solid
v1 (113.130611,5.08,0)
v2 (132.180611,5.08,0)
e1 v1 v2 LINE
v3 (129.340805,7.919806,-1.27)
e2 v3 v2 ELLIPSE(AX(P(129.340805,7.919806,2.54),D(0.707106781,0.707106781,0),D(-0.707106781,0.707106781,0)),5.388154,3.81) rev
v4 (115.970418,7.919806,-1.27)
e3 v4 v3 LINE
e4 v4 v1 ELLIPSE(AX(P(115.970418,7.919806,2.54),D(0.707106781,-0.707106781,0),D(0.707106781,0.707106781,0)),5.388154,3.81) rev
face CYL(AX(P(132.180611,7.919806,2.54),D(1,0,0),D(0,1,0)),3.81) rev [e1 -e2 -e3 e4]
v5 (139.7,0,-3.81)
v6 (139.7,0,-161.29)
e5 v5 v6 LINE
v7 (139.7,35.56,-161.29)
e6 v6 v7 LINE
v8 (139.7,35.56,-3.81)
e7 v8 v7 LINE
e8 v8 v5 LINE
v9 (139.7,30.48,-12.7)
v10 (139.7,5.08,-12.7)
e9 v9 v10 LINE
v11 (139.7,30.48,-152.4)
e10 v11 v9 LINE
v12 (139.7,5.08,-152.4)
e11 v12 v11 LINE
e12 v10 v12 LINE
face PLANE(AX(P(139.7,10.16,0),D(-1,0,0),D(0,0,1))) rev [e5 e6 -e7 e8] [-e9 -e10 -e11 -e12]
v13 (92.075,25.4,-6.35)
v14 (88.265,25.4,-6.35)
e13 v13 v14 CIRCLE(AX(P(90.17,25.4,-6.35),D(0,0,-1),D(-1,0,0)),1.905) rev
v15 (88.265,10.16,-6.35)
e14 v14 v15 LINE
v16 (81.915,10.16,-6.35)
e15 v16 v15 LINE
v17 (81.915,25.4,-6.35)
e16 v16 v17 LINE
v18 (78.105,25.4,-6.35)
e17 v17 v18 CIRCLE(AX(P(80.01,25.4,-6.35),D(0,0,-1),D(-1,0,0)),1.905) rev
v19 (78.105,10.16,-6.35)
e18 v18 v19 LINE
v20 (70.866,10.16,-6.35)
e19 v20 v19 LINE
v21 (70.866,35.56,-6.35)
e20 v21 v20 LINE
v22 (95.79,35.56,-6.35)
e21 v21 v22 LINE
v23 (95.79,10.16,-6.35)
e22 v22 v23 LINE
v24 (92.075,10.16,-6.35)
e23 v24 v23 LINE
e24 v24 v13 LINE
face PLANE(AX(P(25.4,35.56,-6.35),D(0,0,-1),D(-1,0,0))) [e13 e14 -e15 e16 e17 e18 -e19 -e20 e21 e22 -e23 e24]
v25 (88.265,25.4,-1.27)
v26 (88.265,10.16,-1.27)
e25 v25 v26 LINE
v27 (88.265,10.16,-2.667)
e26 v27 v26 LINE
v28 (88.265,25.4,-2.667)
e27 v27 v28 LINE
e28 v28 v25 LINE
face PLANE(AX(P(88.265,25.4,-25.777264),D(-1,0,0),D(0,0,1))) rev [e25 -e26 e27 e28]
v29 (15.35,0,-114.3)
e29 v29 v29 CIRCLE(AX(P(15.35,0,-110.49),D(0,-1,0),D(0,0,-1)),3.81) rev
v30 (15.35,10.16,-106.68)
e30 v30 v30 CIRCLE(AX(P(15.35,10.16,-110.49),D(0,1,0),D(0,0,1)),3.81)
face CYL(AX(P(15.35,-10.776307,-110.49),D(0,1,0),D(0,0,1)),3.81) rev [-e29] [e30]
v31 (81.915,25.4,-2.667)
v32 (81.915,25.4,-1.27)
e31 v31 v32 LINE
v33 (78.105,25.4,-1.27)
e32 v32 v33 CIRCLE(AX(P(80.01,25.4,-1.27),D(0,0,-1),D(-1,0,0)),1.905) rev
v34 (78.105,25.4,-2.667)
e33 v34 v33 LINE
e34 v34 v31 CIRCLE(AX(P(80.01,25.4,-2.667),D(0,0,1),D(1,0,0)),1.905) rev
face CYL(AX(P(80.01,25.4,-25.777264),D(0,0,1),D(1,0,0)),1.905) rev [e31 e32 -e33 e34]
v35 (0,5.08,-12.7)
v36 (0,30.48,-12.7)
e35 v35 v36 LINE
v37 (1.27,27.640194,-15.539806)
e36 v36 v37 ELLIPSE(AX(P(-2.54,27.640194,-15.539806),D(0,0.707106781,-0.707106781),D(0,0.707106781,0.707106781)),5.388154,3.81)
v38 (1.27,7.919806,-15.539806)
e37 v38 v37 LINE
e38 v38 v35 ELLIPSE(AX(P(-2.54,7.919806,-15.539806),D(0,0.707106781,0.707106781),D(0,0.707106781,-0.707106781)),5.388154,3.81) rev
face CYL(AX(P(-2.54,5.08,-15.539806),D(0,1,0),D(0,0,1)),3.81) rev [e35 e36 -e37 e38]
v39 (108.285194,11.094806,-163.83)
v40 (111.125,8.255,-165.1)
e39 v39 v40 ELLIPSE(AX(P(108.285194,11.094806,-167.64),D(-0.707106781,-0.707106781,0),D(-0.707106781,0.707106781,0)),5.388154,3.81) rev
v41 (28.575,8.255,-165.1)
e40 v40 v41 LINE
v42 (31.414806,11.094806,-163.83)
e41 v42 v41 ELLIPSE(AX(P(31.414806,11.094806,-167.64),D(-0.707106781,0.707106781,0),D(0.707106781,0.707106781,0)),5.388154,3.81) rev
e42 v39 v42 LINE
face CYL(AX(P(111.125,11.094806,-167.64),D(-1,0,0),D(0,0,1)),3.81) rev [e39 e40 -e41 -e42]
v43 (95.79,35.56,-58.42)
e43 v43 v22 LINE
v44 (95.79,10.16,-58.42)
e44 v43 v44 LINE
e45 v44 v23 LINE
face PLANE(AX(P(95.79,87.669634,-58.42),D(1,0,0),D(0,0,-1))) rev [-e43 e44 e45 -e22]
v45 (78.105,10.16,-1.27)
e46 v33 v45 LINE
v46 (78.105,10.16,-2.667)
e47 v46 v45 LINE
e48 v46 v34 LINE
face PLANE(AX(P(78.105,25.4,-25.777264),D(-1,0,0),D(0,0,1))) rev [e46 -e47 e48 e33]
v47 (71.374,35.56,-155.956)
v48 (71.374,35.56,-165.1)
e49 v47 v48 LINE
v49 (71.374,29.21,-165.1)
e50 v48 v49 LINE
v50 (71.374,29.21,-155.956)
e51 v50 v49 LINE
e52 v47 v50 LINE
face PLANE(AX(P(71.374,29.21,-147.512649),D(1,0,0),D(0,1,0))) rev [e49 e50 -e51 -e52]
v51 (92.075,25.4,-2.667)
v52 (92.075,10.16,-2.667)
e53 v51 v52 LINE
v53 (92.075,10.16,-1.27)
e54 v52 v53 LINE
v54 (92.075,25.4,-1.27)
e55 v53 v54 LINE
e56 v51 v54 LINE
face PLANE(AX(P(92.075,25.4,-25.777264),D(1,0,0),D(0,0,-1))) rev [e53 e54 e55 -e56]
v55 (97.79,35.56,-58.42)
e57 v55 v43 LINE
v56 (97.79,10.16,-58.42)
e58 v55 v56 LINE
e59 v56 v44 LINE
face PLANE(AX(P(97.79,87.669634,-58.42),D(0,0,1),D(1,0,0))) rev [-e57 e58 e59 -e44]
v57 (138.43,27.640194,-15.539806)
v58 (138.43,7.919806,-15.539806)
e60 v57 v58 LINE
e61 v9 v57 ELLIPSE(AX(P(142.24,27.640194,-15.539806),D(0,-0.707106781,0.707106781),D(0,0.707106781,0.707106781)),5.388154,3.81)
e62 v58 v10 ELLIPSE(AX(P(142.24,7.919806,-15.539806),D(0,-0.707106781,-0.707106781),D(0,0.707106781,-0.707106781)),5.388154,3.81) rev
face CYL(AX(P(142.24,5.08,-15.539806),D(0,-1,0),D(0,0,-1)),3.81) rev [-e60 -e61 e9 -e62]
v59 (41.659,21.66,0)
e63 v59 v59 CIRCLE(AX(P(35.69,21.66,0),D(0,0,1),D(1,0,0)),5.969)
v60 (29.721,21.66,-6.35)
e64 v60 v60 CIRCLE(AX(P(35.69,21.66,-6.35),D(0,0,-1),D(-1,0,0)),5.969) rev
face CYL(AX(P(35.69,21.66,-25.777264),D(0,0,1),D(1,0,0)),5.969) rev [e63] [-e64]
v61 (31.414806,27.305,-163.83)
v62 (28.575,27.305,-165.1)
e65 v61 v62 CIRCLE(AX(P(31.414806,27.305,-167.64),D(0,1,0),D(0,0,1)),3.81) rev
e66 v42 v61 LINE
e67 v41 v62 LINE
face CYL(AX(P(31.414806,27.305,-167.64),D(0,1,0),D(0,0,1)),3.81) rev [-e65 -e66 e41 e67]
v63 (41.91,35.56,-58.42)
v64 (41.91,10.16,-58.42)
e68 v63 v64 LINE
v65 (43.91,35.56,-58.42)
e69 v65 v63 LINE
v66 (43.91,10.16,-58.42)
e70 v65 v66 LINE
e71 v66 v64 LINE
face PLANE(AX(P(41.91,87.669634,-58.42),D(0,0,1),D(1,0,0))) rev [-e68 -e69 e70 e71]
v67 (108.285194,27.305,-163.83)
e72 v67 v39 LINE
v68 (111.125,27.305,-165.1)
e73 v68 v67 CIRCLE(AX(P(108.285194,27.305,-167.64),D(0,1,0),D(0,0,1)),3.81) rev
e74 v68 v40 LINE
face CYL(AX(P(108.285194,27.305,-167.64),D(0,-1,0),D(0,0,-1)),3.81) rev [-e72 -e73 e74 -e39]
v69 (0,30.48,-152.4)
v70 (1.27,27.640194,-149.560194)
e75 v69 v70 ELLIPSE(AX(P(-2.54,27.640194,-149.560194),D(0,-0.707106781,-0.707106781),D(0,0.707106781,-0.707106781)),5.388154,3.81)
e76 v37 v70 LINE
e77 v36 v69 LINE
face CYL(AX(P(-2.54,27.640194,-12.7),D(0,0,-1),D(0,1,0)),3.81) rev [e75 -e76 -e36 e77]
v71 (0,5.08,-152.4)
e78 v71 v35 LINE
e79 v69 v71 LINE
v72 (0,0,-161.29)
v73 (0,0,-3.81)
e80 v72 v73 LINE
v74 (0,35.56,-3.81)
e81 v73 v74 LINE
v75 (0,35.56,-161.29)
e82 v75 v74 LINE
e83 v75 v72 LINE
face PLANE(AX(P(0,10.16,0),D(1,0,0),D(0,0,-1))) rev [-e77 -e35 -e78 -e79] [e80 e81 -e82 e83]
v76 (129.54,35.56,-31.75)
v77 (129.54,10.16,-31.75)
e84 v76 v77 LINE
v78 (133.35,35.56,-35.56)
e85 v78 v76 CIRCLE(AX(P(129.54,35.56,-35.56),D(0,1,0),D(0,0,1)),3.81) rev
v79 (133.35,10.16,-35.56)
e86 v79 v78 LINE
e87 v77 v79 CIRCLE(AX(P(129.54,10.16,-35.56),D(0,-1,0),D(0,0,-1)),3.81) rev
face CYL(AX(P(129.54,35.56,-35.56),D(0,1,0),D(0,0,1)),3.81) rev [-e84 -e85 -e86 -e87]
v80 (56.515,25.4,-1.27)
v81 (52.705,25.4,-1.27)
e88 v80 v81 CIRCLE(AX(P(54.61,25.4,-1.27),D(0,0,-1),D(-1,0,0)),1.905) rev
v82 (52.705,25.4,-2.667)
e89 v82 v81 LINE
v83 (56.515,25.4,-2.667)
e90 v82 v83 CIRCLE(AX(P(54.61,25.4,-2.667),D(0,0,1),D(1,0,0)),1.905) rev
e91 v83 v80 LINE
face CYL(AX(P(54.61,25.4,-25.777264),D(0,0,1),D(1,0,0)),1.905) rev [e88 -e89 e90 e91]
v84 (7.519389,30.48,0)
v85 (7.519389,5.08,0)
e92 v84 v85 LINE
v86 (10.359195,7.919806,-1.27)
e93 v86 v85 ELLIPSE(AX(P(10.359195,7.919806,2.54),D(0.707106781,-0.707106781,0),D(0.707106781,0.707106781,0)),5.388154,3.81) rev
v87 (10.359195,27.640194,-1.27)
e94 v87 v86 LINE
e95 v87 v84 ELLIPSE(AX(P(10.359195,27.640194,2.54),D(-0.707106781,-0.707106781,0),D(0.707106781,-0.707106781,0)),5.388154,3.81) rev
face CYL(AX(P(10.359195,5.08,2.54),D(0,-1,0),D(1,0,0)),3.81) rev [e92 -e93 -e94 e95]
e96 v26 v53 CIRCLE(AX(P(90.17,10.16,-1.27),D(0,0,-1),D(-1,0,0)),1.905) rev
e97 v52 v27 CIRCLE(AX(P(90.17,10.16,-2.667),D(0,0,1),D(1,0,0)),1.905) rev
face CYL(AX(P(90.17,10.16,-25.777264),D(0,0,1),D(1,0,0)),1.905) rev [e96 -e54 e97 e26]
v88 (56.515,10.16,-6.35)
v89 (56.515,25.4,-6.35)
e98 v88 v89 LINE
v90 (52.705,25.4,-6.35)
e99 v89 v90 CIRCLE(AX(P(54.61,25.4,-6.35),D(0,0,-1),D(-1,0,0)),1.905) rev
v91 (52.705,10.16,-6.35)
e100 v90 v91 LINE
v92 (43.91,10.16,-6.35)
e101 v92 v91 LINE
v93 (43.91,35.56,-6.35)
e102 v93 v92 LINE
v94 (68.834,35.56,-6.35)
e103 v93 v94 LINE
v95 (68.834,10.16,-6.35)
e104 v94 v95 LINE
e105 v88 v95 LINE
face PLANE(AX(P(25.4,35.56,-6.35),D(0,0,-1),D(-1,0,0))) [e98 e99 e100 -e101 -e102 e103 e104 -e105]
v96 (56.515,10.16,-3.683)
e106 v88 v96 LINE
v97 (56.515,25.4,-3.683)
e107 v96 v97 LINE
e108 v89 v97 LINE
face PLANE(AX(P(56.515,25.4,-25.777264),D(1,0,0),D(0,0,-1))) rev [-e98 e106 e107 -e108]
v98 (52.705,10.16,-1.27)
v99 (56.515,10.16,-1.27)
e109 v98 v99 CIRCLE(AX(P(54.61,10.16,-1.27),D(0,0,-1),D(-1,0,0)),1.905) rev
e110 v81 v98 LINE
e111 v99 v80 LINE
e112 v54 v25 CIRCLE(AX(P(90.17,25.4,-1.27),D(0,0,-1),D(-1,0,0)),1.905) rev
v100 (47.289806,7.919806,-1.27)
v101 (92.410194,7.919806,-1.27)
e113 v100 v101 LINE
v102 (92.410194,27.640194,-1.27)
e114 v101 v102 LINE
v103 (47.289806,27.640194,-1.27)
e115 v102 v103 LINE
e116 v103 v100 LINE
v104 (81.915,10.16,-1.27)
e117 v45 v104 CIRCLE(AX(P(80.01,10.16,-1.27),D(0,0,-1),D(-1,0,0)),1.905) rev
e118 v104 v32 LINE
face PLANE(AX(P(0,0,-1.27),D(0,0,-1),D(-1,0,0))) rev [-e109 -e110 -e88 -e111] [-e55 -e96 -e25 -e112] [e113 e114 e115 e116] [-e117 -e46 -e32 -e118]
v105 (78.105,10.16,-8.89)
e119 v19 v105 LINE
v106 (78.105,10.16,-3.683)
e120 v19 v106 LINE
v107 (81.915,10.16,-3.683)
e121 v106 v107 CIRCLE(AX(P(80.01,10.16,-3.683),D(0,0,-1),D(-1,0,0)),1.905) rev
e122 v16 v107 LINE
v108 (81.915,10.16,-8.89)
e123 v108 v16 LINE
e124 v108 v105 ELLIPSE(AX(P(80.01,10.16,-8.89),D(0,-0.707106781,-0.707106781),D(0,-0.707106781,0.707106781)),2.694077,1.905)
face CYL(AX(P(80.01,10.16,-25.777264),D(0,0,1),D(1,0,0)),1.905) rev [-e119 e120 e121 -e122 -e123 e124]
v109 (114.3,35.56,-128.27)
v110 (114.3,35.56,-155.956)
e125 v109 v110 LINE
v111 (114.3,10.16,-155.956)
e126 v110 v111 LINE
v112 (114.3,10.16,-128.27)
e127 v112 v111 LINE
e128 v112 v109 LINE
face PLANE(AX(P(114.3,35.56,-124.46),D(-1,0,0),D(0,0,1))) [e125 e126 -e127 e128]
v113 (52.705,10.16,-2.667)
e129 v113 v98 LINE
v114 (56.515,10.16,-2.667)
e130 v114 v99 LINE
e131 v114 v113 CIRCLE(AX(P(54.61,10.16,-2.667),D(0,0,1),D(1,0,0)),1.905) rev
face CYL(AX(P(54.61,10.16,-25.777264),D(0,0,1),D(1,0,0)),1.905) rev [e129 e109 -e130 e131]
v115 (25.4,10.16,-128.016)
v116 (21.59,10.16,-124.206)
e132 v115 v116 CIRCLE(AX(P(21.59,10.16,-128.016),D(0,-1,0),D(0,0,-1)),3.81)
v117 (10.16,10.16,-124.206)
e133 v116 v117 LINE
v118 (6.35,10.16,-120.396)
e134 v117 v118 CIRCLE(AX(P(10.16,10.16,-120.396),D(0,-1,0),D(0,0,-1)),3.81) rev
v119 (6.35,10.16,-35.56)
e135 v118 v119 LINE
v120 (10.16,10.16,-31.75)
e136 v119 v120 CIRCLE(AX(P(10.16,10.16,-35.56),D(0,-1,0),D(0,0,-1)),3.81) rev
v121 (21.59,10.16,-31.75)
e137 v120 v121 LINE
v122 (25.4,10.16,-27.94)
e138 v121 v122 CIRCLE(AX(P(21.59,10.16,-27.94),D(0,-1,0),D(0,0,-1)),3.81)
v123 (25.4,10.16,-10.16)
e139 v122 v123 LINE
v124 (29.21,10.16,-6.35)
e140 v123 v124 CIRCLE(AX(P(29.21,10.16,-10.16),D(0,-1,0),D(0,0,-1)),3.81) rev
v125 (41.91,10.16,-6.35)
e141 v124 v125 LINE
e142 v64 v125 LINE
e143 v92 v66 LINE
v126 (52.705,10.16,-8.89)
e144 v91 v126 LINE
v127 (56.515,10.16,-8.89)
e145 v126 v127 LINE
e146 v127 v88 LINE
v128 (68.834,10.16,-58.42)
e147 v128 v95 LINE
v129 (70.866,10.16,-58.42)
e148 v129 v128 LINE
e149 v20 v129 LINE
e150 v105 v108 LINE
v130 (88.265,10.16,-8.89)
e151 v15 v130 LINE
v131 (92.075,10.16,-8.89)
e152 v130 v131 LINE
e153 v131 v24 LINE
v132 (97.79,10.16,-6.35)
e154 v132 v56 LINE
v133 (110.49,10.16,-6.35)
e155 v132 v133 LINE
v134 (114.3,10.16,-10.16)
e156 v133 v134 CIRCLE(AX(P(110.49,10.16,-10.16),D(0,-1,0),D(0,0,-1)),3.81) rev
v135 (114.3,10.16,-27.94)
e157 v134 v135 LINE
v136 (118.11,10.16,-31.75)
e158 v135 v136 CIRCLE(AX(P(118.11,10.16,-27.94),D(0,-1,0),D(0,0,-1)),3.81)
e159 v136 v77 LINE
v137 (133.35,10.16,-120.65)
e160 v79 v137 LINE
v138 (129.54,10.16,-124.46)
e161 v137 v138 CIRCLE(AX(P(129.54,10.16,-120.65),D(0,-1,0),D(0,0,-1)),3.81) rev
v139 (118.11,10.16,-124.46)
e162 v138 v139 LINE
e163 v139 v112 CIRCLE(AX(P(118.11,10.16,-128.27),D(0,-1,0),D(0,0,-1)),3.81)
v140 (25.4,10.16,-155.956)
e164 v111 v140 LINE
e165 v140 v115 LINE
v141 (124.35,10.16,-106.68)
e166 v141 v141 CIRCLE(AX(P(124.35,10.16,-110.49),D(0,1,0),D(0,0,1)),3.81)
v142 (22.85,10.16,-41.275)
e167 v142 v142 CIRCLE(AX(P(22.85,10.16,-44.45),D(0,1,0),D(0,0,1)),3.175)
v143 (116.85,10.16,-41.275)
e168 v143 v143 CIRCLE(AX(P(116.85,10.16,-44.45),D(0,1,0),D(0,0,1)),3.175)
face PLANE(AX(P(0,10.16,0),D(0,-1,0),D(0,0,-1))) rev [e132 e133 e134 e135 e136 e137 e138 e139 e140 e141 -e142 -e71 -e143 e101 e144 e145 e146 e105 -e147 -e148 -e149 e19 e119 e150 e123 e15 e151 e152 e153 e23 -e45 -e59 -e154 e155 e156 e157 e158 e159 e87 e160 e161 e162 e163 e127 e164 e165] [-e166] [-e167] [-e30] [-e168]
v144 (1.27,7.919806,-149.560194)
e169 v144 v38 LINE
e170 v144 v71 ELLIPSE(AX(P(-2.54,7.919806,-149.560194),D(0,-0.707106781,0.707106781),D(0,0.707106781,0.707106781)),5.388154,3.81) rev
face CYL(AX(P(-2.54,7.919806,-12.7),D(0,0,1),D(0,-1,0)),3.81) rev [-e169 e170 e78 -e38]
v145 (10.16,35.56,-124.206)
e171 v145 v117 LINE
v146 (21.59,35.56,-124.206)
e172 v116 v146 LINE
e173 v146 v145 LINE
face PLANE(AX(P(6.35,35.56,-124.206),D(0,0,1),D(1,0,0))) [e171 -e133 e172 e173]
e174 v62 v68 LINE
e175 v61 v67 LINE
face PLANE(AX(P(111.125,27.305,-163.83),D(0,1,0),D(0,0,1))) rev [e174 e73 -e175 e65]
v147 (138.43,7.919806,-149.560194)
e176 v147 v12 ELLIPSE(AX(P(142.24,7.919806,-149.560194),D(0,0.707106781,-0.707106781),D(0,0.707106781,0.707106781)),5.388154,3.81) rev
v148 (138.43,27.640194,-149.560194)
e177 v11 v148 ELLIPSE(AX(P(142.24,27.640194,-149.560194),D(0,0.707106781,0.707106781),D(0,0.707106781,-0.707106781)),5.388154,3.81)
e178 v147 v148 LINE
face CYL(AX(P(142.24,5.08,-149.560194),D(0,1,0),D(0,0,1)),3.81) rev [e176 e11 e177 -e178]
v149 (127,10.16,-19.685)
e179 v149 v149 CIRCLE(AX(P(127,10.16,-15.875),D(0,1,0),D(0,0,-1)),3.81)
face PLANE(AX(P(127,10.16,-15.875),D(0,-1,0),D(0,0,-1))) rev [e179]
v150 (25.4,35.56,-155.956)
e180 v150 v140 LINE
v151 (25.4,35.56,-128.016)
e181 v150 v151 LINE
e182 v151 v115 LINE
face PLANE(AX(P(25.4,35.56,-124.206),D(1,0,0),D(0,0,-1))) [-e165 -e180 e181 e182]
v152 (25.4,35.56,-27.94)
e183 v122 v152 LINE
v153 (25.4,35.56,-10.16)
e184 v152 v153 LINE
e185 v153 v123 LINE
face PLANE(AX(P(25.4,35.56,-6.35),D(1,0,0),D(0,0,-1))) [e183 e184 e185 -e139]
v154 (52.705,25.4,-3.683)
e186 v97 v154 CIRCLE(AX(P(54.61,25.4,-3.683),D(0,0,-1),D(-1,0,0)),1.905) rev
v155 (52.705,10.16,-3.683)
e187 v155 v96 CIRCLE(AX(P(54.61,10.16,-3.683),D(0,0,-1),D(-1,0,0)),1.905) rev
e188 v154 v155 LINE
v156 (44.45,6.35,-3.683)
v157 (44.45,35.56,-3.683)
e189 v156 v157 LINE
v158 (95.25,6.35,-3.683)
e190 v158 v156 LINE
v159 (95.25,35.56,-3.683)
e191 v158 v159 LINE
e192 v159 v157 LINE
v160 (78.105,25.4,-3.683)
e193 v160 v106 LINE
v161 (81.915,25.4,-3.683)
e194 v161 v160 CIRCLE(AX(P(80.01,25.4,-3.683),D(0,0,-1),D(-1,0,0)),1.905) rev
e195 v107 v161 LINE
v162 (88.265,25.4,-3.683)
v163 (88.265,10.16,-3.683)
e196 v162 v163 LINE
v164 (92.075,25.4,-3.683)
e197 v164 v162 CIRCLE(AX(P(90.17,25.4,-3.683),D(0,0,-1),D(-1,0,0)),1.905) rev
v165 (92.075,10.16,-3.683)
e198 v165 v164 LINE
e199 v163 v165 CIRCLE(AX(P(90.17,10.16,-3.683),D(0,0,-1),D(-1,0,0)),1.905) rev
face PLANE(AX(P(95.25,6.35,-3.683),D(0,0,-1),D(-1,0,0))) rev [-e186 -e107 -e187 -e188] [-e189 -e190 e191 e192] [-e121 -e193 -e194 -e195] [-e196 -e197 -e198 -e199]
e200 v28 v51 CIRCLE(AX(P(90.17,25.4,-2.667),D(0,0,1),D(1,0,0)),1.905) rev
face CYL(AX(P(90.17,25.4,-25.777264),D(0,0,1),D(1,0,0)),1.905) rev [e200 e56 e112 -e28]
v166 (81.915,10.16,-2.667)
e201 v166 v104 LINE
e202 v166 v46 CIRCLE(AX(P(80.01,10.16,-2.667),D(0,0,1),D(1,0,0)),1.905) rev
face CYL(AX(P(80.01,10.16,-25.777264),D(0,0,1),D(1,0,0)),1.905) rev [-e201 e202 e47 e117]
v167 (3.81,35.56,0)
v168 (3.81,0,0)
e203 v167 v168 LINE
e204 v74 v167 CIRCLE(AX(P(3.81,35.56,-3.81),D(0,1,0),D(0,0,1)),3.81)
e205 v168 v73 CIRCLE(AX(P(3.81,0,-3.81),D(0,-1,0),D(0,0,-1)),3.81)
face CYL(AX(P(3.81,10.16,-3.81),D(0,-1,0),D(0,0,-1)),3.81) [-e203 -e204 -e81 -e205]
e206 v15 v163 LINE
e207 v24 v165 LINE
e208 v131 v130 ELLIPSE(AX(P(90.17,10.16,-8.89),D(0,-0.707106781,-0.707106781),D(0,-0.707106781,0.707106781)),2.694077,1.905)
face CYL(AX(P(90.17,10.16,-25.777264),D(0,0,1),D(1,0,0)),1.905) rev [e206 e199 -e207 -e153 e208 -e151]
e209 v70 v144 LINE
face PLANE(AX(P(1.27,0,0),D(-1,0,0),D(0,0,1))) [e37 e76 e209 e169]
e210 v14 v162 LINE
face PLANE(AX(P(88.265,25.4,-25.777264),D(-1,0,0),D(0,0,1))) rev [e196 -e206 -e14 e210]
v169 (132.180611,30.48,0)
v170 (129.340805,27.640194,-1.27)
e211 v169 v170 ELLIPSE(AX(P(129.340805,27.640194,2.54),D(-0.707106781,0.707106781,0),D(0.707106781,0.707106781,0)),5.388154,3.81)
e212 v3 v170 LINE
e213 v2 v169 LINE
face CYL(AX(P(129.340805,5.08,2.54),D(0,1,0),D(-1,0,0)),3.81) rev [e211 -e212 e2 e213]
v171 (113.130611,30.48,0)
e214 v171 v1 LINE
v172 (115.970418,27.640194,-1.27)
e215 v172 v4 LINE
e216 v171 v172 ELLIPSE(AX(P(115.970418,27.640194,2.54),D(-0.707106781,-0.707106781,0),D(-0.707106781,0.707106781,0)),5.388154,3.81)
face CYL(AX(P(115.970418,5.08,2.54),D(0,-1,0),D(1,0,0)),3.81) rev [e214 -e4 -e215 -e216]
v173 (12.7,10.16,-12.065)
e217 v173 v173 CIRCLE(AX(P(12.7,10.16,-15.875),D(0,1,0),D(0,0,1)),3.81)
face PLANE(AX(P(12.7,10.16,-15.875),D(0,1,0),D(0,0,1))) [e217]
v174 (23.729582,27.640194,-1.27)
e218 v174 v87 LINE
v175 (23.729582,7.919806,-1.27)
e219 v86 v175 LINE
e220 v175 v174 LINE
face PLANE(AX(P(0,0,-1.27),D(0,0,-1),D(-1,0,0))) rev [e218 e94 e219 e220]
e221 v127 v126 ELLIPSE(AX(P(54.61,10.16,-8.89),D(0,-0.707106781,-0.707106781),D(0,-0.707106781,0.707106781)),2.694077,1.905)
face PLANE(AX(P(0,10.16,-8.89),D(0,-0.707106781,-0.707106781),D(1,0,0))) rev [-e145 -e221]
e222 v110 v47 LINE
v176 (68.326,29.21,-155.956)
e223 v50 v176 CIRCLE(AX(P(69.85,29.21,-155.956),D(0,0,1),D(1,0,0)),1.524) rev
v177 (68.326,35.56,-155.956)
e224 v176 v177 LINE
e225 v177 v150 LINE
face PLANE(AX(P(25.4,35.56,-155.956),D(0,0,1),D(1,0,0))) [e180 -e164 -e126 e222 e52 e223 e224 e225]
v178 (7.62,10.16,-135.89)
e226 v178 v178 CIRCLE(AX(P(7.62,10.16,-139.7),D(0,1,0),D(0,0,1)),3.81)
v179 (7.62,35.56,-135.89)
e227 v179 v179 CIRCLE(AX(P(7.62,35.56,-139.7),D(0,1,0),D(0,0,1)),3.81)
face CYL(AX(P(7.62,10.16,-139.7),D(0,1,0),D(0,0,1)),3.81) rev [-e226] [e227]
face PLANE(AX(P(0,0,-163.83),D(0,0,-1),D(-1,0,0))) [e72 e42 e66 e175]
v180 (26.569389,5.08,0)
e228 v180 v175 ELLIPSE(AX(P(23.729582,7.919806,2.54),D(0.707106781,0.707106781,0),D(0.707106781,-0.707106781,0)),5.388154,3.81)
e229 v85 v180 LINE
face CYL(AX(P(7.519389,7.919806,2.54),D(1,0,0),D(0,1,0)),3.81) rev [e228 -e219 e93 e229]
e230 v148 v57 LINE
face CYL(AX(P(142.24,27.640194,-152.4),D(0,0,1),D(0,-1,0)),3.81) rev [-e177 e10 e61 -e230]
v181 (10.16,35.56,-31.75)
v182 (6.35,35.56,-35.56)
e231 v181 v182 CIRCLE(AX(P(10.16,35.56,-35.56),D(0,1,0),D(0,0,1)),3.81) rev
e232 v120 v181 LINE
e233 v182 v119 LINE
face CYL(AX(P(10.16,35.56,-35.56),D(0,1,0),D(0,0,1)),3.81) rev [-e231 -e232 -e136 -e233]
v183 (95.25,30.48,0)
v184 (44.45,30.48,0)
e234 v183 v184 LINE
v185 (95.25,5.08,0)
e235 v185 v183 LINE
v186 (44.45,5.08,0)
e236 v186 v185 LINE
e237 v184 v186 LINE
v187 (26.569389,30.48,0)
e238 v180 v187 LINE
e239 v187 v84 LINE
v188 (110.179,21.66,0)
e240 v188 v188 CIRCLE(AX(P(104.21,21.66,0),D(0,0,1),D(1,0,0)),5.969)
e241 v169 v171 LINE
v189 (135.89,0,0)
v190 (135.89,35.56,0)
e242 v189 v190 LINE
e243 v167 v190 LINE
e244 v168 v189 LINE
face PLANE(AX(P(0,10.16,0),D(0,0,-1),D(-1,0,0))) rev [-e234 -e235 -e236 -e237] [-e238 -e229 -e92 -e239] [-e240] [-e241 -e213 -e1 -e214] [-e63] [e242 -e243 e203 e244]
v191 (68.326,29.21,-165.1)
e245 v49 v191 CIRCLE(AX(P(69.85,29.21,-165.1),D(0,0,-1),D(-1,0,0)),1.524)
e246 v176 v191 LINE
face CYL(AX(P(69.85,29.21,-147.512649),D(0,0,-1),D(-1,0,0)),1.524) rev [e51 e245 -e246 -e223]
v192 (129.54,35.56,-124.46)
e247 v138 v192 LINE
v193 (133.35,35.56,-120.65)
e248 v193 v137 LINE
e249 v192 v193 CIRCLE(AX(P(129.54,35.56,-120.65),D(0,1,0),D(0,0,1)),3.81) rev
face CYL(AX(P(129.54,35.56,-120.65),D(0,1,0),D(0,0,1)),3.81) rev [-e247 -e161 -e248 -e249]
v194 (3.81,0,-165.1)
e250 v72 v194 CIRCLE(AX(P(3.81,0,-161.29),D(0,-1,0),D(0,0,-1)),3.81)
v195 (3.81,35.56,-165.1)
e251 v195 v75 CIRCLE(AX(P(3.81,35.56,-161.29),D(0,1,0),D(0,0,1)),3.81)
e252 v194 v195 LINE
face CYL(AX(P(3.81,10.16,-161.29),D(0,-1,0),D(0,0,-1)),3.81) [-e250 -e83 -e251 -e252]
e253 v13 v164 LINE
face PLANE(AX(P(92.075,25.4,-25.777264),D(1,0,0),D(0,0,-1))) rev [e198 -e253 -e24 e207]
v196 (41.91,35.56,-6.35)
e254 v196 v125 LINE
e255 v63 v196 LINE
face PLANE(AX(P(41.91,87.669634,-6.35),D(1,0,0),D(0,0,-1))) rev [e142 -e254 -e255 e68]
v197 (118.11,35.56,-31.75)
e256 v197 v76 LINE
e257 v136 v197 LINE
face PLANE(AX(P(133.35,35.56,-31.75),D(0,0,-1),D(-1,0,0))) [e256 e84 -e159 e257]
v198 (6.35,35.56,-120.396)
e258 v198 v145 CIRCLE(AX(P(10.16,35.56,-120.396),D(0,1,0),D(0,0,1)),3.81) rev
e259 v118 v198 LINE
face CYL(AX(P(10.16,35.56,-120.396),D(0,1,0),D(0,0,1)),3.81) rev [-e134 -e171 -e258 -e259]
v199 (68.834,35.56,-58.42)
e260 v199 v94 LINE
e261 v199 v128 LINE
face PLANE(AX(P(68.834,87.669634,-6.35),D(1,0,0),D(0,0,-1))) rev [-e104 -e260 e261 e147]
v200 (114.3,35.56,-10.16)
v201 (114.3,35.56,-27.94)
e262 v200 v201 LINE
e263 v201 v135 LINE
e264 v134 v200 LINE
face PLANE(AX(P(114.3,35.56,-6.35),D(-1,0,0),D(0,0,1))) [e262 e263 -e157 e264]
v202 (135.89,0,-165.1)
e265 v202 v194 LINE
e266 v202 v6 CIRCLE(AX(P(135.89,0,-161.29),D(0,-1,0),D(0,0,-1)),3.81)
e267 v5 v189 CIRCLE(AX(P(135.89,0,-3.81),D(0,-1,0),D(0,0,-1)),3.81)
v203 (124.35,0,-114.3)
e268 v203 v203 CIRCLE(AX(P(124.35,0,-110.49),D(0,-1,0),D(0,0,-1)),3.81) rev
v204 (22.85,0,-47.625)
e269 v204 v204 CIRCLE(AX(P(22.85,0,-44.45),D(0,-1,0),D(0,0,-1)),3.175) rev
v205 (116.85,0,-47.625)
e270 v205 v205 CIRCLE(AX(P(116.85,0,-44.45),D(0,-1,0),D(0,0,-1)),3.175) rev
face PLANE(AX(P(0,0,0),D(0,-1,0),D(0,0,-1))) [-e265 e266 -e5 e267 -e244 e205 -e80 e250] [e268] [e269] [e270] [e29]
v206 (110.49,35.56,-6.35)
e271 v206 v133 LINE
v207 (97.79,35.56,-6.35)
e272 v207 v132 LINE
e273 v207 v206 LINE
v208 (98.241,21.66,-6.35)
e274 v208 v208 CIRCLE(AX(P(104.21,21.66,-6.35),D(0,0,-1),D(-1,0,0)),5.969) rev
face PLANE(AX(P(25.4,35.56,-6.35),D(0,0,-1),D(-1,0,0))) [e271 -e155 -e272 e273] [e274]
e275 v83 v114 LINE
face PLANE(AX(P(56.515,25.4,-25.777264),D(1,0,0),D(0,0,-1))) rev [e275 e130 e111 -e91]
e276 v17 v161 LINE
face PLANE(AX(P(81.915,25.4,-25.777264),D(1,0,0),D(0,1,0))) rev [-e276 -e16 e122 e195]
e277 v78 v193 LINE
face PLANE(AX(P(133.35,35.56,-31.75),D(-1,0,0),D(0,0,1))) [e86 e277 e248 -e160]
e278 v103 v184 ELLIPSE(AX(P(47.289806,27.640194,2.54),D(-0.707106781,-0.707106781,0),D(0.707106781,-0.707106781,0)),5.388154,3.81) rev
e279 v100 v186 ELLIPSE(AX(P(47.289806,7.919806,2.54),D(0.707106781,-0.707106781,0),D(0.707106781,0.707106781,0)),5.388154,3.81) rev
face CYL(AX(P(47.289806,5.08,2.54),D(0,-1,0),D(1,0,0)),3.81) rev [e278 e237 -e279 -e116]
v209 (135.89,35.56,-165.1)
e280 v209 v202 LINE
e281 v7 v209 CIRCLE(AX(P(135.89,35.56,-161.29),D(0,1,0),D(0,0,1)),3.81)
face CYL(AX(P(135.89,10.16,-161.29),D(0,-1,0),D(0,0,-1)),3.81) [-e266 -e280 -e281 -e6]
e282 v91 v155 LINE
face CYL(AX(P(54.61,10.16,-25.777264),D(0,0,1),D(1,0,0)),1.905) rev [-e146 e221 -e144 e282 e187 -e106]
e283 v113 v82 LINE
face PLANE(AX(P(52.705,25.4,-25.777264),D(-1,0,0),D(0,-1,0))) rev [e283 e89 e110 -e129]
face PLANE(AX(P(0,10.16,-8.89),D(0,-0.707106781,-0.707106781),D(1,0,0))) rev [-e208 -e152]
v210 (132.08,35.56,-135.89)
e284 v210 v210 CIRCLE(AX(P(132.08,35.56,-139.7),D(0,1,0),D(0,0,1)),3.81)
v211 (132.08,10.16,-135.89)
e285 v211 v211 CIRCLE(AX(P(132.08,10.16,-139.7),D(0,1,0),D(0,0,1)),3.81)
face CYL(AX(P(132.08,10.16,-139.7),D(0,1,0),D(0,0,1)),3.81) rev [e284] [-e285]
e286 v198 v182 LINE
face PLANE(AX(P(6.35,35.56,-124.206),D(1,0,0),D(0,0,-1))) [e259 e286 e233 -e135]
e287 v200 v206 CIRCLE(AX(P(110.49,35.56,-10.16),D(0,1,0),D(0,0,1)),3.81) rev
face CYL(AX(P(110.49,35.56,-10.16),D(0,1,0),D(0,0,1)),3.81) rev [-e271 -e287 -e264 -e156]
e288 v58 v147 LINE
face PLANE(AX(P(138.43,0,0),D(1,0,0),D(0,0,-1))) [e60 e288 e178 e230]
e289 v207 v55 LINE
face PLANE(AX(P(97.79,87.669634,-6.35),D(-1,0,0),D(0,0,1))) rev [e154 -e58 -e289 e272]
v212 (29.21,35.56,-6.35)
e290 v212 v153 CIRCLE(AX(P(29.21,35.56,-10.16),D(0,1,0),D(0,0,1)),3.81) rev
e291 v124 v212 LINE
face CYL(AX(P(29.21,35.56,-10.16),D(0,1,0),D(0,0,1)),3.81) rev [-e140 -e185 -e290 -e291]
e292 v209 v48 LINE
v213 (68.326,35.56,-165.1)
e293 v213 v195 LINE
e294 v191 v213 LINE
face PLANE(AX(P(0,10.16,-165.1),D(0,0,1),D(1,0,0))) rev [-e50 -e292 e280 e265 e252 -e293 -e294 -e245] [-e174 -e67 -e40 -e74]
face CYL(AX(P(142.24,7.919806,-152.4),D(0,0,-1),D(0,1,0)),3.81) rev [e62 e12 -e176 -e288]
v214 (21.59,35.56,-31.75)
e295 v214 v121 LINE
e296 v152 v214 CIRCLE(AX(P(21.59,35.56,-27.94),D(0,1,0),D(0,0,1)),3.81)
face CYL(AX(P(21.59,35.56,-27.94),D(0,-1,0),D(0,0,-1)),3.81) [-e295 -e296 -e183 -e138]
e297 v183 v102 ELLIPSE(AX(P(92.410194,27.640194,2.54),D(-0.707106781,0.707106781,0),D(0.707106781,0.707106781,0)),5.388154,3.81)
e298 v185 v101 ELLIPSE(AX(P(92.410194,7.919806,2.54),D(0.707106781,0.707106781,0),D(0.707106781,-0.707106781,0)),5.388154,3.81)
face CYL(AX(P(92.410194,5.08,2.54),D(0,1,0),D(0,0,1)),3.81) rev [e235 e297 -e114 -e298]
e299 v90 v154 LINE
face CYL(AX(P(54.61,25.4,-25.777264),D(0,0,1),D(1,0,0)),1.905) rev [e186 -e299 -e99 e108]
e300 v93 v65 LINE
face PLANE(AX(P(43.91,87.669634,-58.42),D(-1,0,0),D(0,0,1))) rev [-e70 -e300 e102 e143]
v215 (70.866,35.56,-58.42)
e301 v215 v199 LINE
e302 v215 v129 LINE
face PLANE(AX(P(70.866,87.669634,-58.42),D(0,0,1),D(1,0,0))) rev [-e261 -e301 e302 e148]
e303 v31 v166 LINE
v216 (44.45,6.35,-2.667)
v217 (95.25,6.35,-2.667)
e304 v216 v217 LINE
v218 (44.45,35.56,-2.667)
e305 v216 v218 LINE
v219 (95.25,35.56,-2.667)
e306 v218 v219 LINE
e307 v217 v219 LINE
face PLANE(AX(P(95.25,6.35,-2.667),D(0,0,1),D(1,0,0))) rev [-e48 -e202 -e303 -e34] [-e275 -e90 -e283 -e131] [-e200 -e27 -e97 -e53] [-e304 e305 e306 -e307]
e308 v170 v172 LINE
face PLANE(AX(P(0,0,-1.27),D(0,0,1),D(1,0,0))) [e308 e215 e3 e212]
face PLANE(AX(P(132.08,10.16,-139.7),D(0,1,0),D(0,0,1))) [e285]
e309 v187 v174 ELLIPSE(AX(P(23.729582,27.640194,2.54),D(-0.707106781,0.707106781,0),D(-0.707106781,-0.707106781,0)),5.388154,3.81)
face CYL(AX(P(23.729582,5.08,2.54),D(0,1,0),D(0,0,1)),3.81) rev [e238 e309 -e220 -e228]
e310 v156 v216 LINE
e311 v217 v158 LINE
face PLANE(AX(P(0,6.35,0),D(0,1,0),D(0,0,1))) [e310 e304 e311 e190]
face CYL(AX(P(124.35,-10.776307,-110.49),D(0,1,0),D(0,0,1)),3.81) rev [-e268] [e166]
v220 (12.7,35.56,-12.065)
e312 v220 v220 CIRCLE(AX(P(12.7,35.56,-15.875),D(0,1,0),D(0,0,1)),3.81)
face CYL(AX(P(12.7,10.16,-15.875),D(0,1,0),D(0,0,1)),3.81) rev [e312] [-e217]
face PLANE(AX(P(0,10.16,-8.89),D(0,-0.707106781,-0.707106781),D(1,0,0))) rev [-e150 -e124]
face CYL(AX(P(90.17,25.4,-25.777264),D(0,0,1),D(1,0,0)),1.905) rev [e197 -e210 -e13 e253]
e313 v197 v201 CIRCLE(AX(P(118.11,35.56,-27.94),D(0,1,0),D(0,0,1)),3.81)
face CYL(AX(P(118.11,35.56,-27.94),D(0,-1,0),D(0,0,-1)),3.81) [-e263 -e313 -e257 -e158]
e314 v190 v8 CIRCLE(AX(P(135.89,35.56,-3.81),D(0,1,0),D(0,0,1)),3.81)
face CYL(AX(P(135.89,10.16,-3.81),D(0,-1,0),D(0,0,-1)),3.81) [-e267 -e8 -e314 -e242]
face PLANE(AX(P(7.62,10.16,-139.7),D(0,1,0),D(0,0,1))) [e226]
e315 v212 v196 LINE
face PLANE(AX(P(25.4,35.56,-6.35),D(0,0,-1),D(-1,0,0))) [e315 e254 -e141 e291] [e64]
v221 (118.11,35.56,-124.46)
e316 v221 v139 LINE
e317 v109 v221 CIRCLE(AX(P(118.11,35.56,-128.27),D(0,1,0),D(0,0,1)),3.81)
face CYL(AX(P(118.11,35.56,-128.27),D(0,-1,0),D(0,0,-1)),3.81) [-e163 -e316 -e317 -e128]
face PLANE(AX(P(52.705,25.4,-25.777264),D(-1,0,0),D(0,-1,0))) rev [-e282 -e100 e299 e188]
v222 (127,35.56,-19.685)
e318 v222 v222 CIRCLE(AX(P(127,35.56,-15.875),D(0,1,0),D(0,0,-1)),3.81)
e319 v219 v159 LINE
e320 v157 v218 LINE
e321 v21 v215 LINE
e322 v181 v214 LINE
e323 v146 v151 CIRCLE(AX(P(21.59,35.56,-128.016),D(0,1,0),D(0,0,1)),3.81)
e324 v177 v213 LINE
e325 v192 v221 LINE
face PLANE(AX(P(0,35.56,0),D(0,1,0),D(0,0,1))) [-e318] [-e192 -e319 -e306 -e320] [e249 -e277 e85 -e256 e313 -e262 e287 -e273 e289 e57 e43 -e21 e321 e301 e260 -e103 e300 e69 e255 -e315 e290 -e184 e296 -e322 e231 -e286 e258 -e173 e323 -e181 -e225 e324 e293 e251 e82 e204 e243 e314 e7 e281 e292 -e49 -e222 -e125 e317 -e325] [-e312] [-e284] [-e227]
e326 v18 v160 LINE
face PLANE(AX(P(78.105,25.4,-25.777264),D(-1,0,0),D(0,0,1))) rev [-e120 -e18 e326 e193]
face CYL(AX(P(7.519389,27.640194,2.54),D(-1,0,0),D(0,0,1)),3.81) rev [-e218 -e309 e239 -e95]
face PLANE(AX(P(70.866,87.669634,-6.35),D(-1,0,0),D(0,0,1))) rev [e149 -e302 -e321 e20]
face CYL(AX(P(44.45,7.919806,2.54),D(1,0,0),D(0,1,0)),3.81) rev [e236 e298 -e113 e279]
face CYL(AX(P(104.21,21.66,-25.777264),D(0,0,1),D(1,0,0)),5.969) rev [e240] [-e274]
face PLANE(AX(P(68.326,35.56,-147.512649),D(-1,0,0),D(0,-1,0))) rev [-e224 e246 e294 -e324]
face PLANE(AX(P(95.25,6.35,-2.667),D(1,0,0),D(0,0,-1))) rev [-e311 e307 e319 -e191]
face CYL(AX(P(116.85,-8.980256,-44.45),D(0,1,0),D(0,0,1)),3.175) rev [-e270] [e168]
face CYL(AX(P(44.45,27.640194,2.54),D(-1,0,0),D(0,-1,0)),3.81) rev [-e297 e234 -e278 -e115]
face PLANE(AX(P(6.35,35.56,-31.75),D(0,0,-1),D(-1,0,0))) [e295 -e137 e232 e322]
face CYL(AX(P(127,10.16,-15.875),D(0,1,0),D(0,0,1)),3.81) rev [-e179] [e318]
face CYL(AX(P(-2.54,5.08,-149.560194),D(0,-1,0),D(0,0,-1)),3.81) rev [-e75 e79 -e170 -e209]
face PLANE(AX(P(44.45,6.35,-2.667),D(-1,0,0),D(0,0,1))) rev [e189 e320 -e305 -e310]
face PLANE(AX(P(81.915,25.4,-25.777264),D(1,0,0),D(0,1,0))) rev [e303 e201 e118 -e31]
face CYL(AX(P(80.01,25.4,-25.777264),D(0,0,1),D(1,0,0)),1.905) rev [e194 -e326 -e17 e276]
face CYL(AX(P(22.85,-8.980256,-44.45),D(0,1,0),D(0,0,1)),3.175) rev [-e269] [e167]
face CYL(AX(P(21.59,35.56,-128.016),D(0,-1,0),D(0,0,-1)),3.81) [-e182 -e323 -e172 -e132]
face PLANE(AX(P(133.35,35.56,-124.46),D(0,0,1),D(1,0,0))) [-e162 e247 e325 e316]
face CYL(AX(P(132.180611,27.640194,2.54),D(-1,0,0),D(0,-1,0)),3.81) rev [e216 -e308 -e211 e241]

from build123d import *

# Parameters (mm, degrees)
SKETCH1_W           = 139.7
SKETCH1_H           = 165.1
BOSS_EXTRUDE1_DEPTH = 10.16
SKETCH2_R           = 3.81
CUT_EXTRUDE1_DEPTH  = 10.16
SKETCH3_W           = 139.7
SKETCH3_H           = 165.1
BOSS_EXTRUDE2_DEPTH = 25.4
SKETCH5_R           = 5.969
CUT_EXTRUDE3_DEPTH  = 6.35
FILLET1_R           = 3.81
SKETCH6_R           = 3.81
CUT_EXTRUDE4_DEPTH  = 25.4
SKETCH7_R           = 3.175
CUT_EXTRUDE5_DEPTH  = 10.16
SKETCH12_W          = 82.55
SKETCH12_H          = 19.05
CUT_EXTRUDE9_DEPTH  = 1.27
SKETCH13_W          = 50.8
SKETCH13_H          = 25.4
SKETCH13_W_2        = 19.05
CUT_EXTRUDE10_DEPTH = 1.27
FILLET3_R           = 3.81
FILLET4_R           = 3.81
SKETCH17_W          = 139.7
SKETCH17_H          = 25.4
CUT_EXTRUDE11_DEPTH = 1.27
SKETCH18_W          = 139.7
SKETCH18_H          = 25.4
CUT_EXTRUDE12_DEPTH = 1.27
FILLET5_R           = 3.81
SKETCH19_R          = 3.81
CUT_EXTRUDE13_DEPTH = 25.4
CUT_EXTRUDE14_DEPTH = 9.144
CHAMFER1_SIZE       = 2.54
SKETCH21_W          = 2
SKETCH21_H          = 52.07
SKETCH21_W_2        = 2.032
BOSS_EXTRUDE3_DEPTH = 25.4
SKETCH22_W          = 50.8
SKETCH22_H          = 1.016
CUT_EXTRUDE15_DEPTH = 29.21


with BuildPart() as part:
    # Sketch1 → Boss-Extrude1 (new body)
    with BuildSketch(Plane(origin=(0, 0, 0), x_dir=(1, 0, 0), z_dir=(0, 1, 0))):
        with Locations((69.85, 82.55)):
            Rectangle(SKETCH1_W, SKETCH1_H)
    extrude(amount=BOSS_EXTRUDE1_DEPTH)

    # Sketch2 → Cut-Extrude1 (cut)
    with BuildSketch(Plane(origin=(0, 10.16, 0), x_dir=(1, 0, 0), z_dir=(0, 1, 0))):
        with Locations(Location((15.35, 110.49, 0), (0, 0, 270))):
            Circle(SKETCH2_R)
        with Locations(Location((124.35, 110.49, 0), (0, 0, 270))):
            Circle(SKETCH2_R)
    extrude(amount=-CUT_EXTRUDE1_DEPTH, mode=Mode.SUBTRACT)

    # Sketch3 → Boss-Extrude2 (add)
    with BuildSketch(Plane(origin=(0, 10.16, 0), x_dir=(1, 0, 0), z_dir=(0, 1, 0))):
        with Locations((69.85, 82.55)):
            Rectangle(SKETCH3_W, SKETCH3_H)
        Polygon((6.35, 124.206), (25.4, 124.206), (25.4, 155.956), (69.85, 155.956), (114.3, 155.956), (114.3, 124.46), (133.35, 124.46), (133.35, 31.75), (114.3, 31.75), (114.3, 6.35), (25.4, 6.35), (25.4, 31.75), (6.35, 31.75), align=None, mode=Mode.SUBTRACT)
    extrude(amount=BOSS_EXTRUDE2_DEPTH)

    # Sketch5 → Cut-Extrude3 (cut)
    with BuildSketch(Plane.XY):
        with Locations((35.690000001, 21.66)):
            Circle(SKETCH5_R)
        with Locations((104.21, 21.66)):
            Circle(SKETCH5_R)
        with BuildLine():
            Line((78.105, 25.4), (78.105, 10.16))
            ThreePointArc((78.105, 10.16), (80.01, 8.255), (81.915, 10.16))
            Line((81.915, 10.16), (81.915, 25.4))
            ThreePointArc((81.915, 25.4), (80.01, 27.305), (78.105, 25.4))
        make_face()
        with BuildLine():
            Line((88.265, 25.4), (88.265, 10.16))
            ThreePointArc((88.265, 10.16), (90.17, 8.255), (92.075, 10.16))
            Line((92.075, 10.16), (92.075, 25.4))
            ThreePointArc((92.075, 25.4), (90.17, 27.305), (88.265, 25.4))
        make_face()
        with BuildLine():
            Line((56.515, 25.4), (56.515, 10.16))
            ThreePointArc((56.515, 10.16), (54.61, 8.255), (52.705, 10.16))
            Line((52.705, 10.16), (52.705, 25.4))
            ThreePointArc((52.705, 25.4), (54.61, 27.305), (56.515, 25.4))
        make_face()
    extrude(amount=-CUT_EXTRUDE3_DEPTH, mode=Mode.SUBTRACT)

    # Fillet1
    fillet1_edges = [part.edges().sort_by_distance(p)[0] for p in [
        (25.4, 22.86, -6.35),
        (114.3, 22.86, -6.35),
        (114.3, 22.86, -31.75),
        (133.35, 22.86, -31.75),
        (133.35, 22.86, -124.46),
        (114.3, 22.86, -124.46),
        (25.4, 22.86, -124.206),
        (6.35, 22.86, -124.206),
        (6.35, 22.86, -31.75),
        (25.4, 22.86, -31.75),
        (0, 17.78, -165.1),
        (139.7, 17.78, -165.1),
        (139.7, 17.78, 0),
        (0, 17.78, 0),
    ]]
    fillet(fillet1_edges, radius=FILLET1_R)

    # Sketch6 → Cut-Extrude4 (cut)
    with BuildSketch(Plane(origin=(0, 35.56, 0), x_dir=(1, 0, 0), z_dir=(0, 1, 0))):
        with Locations(Location((12.7, 15.875, 0), (0, 0, 270))):
            Circle(SKETCH6_R)
        with Locations(Location((127, 15.875, 0), (0, 0, 90))):
            Circle(SKETCH6_R)
    extrude(amount=-CUT_EXTRUDE4_DEPTH, mode=Mode.SUBTRACT)

    # Sketch7 → Cut-Extrude5 (cut)
    with BuildSketch(Plane(origin=(0, 10.16, 0), x_dir=(1, 0, 0), z_dir=(0, 1, 0))):
        with Locations(Location((22.85, 44.45, 0), (0, 0, 270))):
            Circle(SKETCH7_R)
        with Locations(Location((116.85, 44.45, 0), (0, 0, 270))):
            Circle(SKETCH7_R)
    extrude(amount=-CUT_EXTRUDE5_DEPTH, mode=Mode.SUBTRACT)

    # Sketch12 → Cut-Extrude9 (cut)
    with BuildSketch(Plane(origin=(0, 0, -165.1), x_dir=(-1, 0, 0), z_dir=(0, 0, -1))):
        with Locations((-69.85, 17.78)):
            Rectangle(SKETCH12_W, SKETCH12_H)
    extrude(amount=-CUT_EXTRUDE9_DEPTH, mode=Mode.SUBTRACT)

    # Sketch13 → Cut-Extrude10 (cut)
    with BuildSketch(Plane.XY):
        with Locations((69.85, 17.78)):
            Rectangle(SKETCH13_W, SKETCH13_H)
        with Locations((122.655611371, 17.78)):
            Rectangle(SKETCH13_W_2, SKETCH13_H)
        with Locations((17.044388629, 17.78)):
            Rectangle(SKETCH13_W_2, SKETCH13_H)
    extrude(amount=-CUT_EXTRUDE10_DEPTH, mode=Mode.SUBTRACT)

    # Fillet3
    # the kernel refuses this fillet: 3.81 mm, written as the material it adds along each edge
    with BuildSketch(Plane(origin=(37.350484171, 5.08, -1.27), x_dir=(0, 0, 1), z_dir=(1, 0, 0)), Plane(origin=(102.349515829, 30.48, -1.27), x_dir=(0, 0, 1), z_dir=(-1, 0, 0))) as fillet3_piece_1:
        with BuildLine():
            CenterArc((3.81, -2.839806331), FILLET3_R, 131.810314896, 48.189685104)
            Line((0, -2.839806331), (0, 0))
            Line((0, 0), (1.27, 0))
        make_face()
    extrude(amount=64.999031657)
    with BuildSketch(Plane(origin=(44.45, 30.48, -1.27), x_dir=(0, 0, 1), z_dir=(0, -1, 0)), Plane(origin=(95.25, 5.08, -1.27), x_dir=(0, 0, 1), z_dir=(0, 1, 0)), Plane(origin=(7.519388629, 30.48, -1.27), x_dir=(0, 0, 1), z_dir=(0, -1, 0)), Plane(origin=(26.569388629, 5.08, -1.27), x_dir=(0, 0, 1), z_dir=(0, 1, 0))) as fillet3_piece_2:
        with BuildLine():
            CenterArc((3.81, -2.839806331), FILLET3_R, 131.810314896, 48.189685104)
            Line((0, -2.839806331), (0, 0))
            Line((0, 0), (1.27, 0))
        make_face()
    extrude(amount=25.4)
    with BuildSketch(Plane(origin=(132.180611371, 30.48, -1.27), x_dir=(0, 0, 1), z_dir=(0, -1, 0)), Plane(origin=(113.130611371, 5.08, -1.27), x_dir=(0, 0, 1), z_dir=(0, 1, 0))) as fillet3_piece_3:
        with BuildLine():
            CenterArc((3.81, 2.839806331), FILLET3_R, 180, 48.189685104)
            Line((0, 2.839806331), (0, 0))
            Line((0, 0), (1.27, 0))
        make_face()
    extrude(amount=25.4)
    with BuildSketch(Plane(origin=(106.031095542, 30.48, -1.27), x_dir=(0, 0, 1), z_dir=(1, 0, 0)), Plane(origin=(132.180611371, 5.08, -1.27), x_dir=(0, 0, 1), z_dir=(-1, 0, 0))) as fillet3_piece_4:
        with BuildLine():
            CenterArc((3.81, 2.839806331), FILLET3_R, 180, 48.189685104)
            Line((0, 2.839806331), (0, 0))
            Line((0, 0), (1.27, 0))
        make_face()
    extrude(amount=26.149515829)
    with BuildSketch(Plane(origin=(7.519388629, 5.08, -1.27), x_dir=(0, 0, 1), z_dir=(1, 0, 0)), Plane(origin=(33.668904458, 30.48, -1.27), x_dir=(0, 0, 1), z_dir=(-1, 0, 0))) as fillet3_piece_5:
        with BuildLine():
            CenterArc((3.81, -2.839806331), FILLET3_R, 131.810314896, 48.189685104)
            Line((0, -2.839806331), (0, 0))
            Line((0, 0), (1.27, 0))
        make_face()
    extrude(amount=26.149515829)

    # Fillet4
    # the kernel refuses this fillet: 3.81 mm, written as the material it adds along each edge
    with BuildSketch(Plane(origin=(28.575, 34.404515829, -163.83), x_dir=(0, 0, -1), z_dir=(0, -1, 0)), Plane(origin=(111.125, 1.155484171, -163.83), x_dir=(0, 0, -1), z_dir=(0, 1, 0))) as fillet4_piece_1:
        with BuildLine():
            CenterArc((3.81, 2.839806331), FILLET4_R, 180, 48.189685104)
            Line((0, 2.839806331), (-0.0762, 2.839806331))
            Line((-0.0762, 2.839806331), (-0.0762, 0))
            Line((-0.0762, 0), (0, -0.0762))
            ThreePointArc((0, -0.0762), (0.635, -0.0762), (1.2192, -0.056796127))
            Line((1.2192, -0.056796127), (1.27, 0))
        make_face()
    extrude(amount=33.249031657)
    with BuildSketch(Plane(origin=(21.475484171, 8.255, -163.83), x_dir=(0, 0, -1), z_dir=(1, 0, 0))) as fillet4_piece_2:
        with BuildLine():
            CenterArc((3.81, 2.839806331), FILLET4_R, 180, 48.189685104)
            Line((0, 2.839806331), (-0.0762, 2.839806331))
            Line((-0.0762, 2.839806331), (-0.0762, 0))
            Line((-0.0762, 0), (0, -0.0762))
            ThreePointArc((0, -0.0762), (0.635, -0.0762), (1.2192, -0.056796127))
            Line((1.2192, -0.056796127), (1.27, 0))
        make_face()
    extrude(amount=96.749031657)

    # Sketch17 → Cut-Extrude11 (cut)
    with BuildSketch(Plane.ZY):
        with Locations((-82.55, 17.78)):
            Rectangle(SKETCH17_W, SKETCH17_H)
    extrude(amount=-CUT_EXTRUDE11_DEPTH, mode=Mode.SUBTRACT)

    # Sketch18 → Cut-Extrude12 (cut)
    with BuildSketch(Plane(origin=(139.7, 0, 0), x_dir=(0, 0, -1), z_dir=(1, 0, 0))):
        with Locations((82.55, 17.78)):
            Rectangle(SKETCH18_W, SKETCH18_H)
    extrude(amount=-CUT_EXTRUDE12_DEPTH, mode=Mode.SUBTRACT)

    # Fillet5
    # the kernel refuses this fillet: 3.81 mm, written as the material it adds along each edge
    with BuildSketch(Plane(origin=(1.27, 30.48, -12.7), x_dir=(-1, 0, 0), z_dir=(0, -1, 0)), Plane(origin=(1.27, 5.08, -152.4), x_dir=(-1, 0, 0), z_dir=(0, 1, 0)), Plane(origin=(138.43, 30.48, -152.4), x_dir=(1, 0, 0), z_dir=(0, -1, 0)), Plane(origin=(138.43, 5.08, -12.7), x_dir=(1, 0, 0), z_dir=(0, 1, 0))) as fillet5_piece_1:
        with BuildLine():
            CenterArc((3.81, 2.839806331), FILLET5_R, 180, 48.189685104)
            Line((0, 2.839806331), (0, 0))
            Line((0, 0), (1.27, 0))
        make_face()
    extrude(amount=25.4)
    with BuildSketch(Plane(origin=(1.27, 5.08, -5.600484171), x_dir=(-1, 0, 0), z_dir=(0, 0, -1)), Plane(origin=(1.27, 30.48, -159.499515829), x_dir=(-1, 0, 0), z_dir=(0, 0, 1)), Plane(origin=(138.43, 5.08, -159.499515829), x_dir=(1, 0, 0), z_dir=(0, 0, 1)), Plane(origin=(138.43, 30.48, -5.600484171), x_dir=(1, 0, 0), z_dir=(0, 0, -1))) as fillet5_piece_2:
        with BuildLine():
            CenterArc((3.81, 2.839806331), FILLET5_R, 180, 48.189685104)
            Line((0, 2.839806331), (0, 0))
            Line((0, 0), (1.27, 0))
        make_face()
    extrude(amount=153.899031657)

    # Sketch19 → Cut-Extrude13 (cut)
    with BuildSketch(Plane(origin=(0, 35.56, 0), x_dir=(1, 0, 0), z_dir=(0, 1, 0))):
        with Locations(Location((7.62, 139.7, 0), (0, 0, 270))):
            Circle(SKETCH19_R)
        with Locations(Location((132.08, 139.7, 0), (0, 0, 270))):
            Circle(SKETCH19_R)
    extrude(amount=-CUT_EXTRUDE13_DEPTH, mode=Mode.SUBTRACT)

    # Sketch20 → Cut-Extrude14 (cut)
    with BuildSketch(Plane(origin=(0, 0, -165.1), x_dir=(-1, 0, 0), z_dir=(0, 0, -1))):
        with BuildLine():
            Line((-71.374, 29.21), (-71.374, 35.56))
            Line((-71.374, 35.56), (-68.326, 35.56))
            Line((-68.326, 35.56), (-68.326, 29.21))
            ThreePointArc((-68.326, 29.21), (-69.85, 27.686), (-71.374, 29.21))
        make_face()
    extrude(amount=-CUT_EXTRUDE14_DEPTH, mode=Mode.SUBTRACT)

    # Chamfer1
    # the kernel refuses this chamfer: 2.54 mm, written as the material it takes off along each edge
    with BuildSketch(Plane(origin=(98.607074789, 10.16, -6.35), x_dir=(0, 0.027495876610586684, -0.9996219169112968), z_dir=(-1, 0, 0))) as chamfer1_piece_1_section:
        Polygon((CHAMFER1_SIZE * 0.999621916911, CHAMFER1_SIZE * 0.0274958766106), (-CHAMFER1_SIZE * 0.0274958766106, CHAMFER1_SIZE * 0.999621916911), (0, 0), align=None)
    chamfer1_piece_1 = extrude(amount=16.874149579, mode=Mode.PRIVATE)
    chamfer1_piece_1 = chamfer1_piece_1 & Plane(origin=(90.17, 10.16, -7.28897011), x_dir=(-1, 0, 0), z_dir=(0, 0, 1)) * Cylinder(1.905, 44, mode=Mode.PRIVATE)
    add(chamfer1_piece_1, mode=Mode.SUBTRACT)
    with BuildSketch(Plane(origin=(98.607074789, 10.16, -6.35), x_dir=(0, 0.027495876610586684, -0.9996219169112968), z_dir=(-1, 0, 0))) as chamfer1_piece_2_section:
        Polygon((CHAMFER1_SIZE * 0.999621916911, CHAMFER1_SIZE * 0.0274958766106), (-CHAMFER1_SIZE * 0.0274958766106, CHAMFER1_SIZE * 0.999621916911), (0, 0), align=None)
    chamfer1_piece_2 = extrude(amount=16.874149579, mode=Mode.PRIVATE)
    chamfer1_piece_2 = chamfer1_piece_2 & Plane(origin=(80.01, 10.16, -7.475433422), x_dir=(-1, 0, 0), z_dir=(0, 0, 1)) * Cylinder(1.905, 44, mode=Mode.PRIVATE)
    add(chamfer1_piece_2, mode=Mode.SUBTRACT)
    with BuildSketch(Plane(origin=(88.447074789, 10.16, -6.35), x_dir=(0, 0.027495876610586684, -0.9996219169112968), z_dir=(-1, 0, 0))) as chamfer1_piece_3_section:
        Polygon((CHAMFER1_SIZE * 0.999621916911, CHAMFER1_SIZE * 0.0274958766106), (-CHAMFER1_SIZE * 0.0274958766106, CHAMFER1_SIZE * 0.999621916911), (0, 0), align=None)
    chamfer1_piece_3 = extrude(amount=16.874149579, mode=Mode.PRIVATE)
    chamfer1_piece_3 = chamfer1_piece_3 & Plane(origin=(90.17, 10.16, -7.475433422), x_dir=(-1, 0, 0), z_dir=(0, 0, 1)) * Cylinder(1.905, 44, mode=Mode.PRIVATE)
    add(chamfer1_piece_3, mode=Mode.SUBTRACT)
    with BuildSketch(Plane(origin=(88.447074789, 10.16, -6.35), x_dir=(0, 0.027495876610586684, -0.9996219169112968), z_dir=(-1, 0, 0))) as chamfer1_piece_4_section:
        Polygon((CHAMFER1_SIZE * 0.999621916911, CHAMFER1_SIZE * 0.0274958766106), (-CHAMFER1_SIZE * 0.0274958766106, CHAMFER1_SIZE * 0.999621916911), (0, 0), align=None)
    chamfer1_piece_4 = extrude(amount=16.874149579, mode=Mode.PRIVATE)
    chamfer1_piece_4 = chamfer1_piece_4 & Plane(origin=(80.01, 10.16, -7.28897011), x_dir=(-1, 0, 0), z_dir=(0, 0, 1)) * Cylinder(1.905, 44, mode=Mode.PRIVATE)
    add(chamfer1_piece_4, mode=Mode.SUBTRACT)
    with BuildSketch(Plane(origin=(63.047074789, 10.16, -6.35), x_dir=(0, 0.027495876610586684, -0.9996219169112968), z_dir=(-1, 0, 0))) as chamfer1_piece_5_section:
        Polygon((CHAMFER1_SIZE * 0.999621916911, CHAMFER1_SIZE * 0.0274958766106), (-CHAMFER1_SIZE * 0.0274958766106, CHAMFER1_SIZE * 0.999621916911), (0, 0), align=None)
    chamfer1_piece_5 = extrude(amount=16.874149579, mode=Mode.PRIVATE)
    chamfer1_piece_5 = chamfer1_piece_5 & Plane(origin=(54.61, 10.16, -7.28897011), x_dir=(1, 0, 0), z_dir=(0, 0, 1)) * Cylinder(1.905, 44, mode=Mode.PRIVATE)
    add(chamfer1_piece_5, mode=Mode.SUBTRACT)

    # Sketch21 → Boss-Extrude3 (add)
    with BuildSketch(Plane(origin=(0, 10.16, 0), x_dir=(1, 0, 0), z_dir=(0, 1, 0))):
        with Locations((42.91, 32.385)):
            Rectangle(SKETCH21_W, SKETCH21_H)
        with Locations((96.79, 32.385)):
            Rectangle(SKETCH21_W, SKETCH21_H)
        with Locations((69.85, 32.385)):
            Rectangle(SKETCH21_W_2, SKETCH21_H)
    extrude(amount=BOSS_EXTRUDE3_DEPTH)

    # Sketch22 → Cut-Extrude15 (cut)
    with BuildSketch(Plane(origin=(0, 35.56, 0), x_dir=(1, 0, 0), z_dir=(0, 1, 0))):
        with Locations((69.85, 3.175)):
            Rectangle(SKETCH22_W, SKETCH22_H)
    extrude(amount=-CUT_EXTRUDE15_DEPTH, mode=Mode.SUBTRACT)


solid = part.part
